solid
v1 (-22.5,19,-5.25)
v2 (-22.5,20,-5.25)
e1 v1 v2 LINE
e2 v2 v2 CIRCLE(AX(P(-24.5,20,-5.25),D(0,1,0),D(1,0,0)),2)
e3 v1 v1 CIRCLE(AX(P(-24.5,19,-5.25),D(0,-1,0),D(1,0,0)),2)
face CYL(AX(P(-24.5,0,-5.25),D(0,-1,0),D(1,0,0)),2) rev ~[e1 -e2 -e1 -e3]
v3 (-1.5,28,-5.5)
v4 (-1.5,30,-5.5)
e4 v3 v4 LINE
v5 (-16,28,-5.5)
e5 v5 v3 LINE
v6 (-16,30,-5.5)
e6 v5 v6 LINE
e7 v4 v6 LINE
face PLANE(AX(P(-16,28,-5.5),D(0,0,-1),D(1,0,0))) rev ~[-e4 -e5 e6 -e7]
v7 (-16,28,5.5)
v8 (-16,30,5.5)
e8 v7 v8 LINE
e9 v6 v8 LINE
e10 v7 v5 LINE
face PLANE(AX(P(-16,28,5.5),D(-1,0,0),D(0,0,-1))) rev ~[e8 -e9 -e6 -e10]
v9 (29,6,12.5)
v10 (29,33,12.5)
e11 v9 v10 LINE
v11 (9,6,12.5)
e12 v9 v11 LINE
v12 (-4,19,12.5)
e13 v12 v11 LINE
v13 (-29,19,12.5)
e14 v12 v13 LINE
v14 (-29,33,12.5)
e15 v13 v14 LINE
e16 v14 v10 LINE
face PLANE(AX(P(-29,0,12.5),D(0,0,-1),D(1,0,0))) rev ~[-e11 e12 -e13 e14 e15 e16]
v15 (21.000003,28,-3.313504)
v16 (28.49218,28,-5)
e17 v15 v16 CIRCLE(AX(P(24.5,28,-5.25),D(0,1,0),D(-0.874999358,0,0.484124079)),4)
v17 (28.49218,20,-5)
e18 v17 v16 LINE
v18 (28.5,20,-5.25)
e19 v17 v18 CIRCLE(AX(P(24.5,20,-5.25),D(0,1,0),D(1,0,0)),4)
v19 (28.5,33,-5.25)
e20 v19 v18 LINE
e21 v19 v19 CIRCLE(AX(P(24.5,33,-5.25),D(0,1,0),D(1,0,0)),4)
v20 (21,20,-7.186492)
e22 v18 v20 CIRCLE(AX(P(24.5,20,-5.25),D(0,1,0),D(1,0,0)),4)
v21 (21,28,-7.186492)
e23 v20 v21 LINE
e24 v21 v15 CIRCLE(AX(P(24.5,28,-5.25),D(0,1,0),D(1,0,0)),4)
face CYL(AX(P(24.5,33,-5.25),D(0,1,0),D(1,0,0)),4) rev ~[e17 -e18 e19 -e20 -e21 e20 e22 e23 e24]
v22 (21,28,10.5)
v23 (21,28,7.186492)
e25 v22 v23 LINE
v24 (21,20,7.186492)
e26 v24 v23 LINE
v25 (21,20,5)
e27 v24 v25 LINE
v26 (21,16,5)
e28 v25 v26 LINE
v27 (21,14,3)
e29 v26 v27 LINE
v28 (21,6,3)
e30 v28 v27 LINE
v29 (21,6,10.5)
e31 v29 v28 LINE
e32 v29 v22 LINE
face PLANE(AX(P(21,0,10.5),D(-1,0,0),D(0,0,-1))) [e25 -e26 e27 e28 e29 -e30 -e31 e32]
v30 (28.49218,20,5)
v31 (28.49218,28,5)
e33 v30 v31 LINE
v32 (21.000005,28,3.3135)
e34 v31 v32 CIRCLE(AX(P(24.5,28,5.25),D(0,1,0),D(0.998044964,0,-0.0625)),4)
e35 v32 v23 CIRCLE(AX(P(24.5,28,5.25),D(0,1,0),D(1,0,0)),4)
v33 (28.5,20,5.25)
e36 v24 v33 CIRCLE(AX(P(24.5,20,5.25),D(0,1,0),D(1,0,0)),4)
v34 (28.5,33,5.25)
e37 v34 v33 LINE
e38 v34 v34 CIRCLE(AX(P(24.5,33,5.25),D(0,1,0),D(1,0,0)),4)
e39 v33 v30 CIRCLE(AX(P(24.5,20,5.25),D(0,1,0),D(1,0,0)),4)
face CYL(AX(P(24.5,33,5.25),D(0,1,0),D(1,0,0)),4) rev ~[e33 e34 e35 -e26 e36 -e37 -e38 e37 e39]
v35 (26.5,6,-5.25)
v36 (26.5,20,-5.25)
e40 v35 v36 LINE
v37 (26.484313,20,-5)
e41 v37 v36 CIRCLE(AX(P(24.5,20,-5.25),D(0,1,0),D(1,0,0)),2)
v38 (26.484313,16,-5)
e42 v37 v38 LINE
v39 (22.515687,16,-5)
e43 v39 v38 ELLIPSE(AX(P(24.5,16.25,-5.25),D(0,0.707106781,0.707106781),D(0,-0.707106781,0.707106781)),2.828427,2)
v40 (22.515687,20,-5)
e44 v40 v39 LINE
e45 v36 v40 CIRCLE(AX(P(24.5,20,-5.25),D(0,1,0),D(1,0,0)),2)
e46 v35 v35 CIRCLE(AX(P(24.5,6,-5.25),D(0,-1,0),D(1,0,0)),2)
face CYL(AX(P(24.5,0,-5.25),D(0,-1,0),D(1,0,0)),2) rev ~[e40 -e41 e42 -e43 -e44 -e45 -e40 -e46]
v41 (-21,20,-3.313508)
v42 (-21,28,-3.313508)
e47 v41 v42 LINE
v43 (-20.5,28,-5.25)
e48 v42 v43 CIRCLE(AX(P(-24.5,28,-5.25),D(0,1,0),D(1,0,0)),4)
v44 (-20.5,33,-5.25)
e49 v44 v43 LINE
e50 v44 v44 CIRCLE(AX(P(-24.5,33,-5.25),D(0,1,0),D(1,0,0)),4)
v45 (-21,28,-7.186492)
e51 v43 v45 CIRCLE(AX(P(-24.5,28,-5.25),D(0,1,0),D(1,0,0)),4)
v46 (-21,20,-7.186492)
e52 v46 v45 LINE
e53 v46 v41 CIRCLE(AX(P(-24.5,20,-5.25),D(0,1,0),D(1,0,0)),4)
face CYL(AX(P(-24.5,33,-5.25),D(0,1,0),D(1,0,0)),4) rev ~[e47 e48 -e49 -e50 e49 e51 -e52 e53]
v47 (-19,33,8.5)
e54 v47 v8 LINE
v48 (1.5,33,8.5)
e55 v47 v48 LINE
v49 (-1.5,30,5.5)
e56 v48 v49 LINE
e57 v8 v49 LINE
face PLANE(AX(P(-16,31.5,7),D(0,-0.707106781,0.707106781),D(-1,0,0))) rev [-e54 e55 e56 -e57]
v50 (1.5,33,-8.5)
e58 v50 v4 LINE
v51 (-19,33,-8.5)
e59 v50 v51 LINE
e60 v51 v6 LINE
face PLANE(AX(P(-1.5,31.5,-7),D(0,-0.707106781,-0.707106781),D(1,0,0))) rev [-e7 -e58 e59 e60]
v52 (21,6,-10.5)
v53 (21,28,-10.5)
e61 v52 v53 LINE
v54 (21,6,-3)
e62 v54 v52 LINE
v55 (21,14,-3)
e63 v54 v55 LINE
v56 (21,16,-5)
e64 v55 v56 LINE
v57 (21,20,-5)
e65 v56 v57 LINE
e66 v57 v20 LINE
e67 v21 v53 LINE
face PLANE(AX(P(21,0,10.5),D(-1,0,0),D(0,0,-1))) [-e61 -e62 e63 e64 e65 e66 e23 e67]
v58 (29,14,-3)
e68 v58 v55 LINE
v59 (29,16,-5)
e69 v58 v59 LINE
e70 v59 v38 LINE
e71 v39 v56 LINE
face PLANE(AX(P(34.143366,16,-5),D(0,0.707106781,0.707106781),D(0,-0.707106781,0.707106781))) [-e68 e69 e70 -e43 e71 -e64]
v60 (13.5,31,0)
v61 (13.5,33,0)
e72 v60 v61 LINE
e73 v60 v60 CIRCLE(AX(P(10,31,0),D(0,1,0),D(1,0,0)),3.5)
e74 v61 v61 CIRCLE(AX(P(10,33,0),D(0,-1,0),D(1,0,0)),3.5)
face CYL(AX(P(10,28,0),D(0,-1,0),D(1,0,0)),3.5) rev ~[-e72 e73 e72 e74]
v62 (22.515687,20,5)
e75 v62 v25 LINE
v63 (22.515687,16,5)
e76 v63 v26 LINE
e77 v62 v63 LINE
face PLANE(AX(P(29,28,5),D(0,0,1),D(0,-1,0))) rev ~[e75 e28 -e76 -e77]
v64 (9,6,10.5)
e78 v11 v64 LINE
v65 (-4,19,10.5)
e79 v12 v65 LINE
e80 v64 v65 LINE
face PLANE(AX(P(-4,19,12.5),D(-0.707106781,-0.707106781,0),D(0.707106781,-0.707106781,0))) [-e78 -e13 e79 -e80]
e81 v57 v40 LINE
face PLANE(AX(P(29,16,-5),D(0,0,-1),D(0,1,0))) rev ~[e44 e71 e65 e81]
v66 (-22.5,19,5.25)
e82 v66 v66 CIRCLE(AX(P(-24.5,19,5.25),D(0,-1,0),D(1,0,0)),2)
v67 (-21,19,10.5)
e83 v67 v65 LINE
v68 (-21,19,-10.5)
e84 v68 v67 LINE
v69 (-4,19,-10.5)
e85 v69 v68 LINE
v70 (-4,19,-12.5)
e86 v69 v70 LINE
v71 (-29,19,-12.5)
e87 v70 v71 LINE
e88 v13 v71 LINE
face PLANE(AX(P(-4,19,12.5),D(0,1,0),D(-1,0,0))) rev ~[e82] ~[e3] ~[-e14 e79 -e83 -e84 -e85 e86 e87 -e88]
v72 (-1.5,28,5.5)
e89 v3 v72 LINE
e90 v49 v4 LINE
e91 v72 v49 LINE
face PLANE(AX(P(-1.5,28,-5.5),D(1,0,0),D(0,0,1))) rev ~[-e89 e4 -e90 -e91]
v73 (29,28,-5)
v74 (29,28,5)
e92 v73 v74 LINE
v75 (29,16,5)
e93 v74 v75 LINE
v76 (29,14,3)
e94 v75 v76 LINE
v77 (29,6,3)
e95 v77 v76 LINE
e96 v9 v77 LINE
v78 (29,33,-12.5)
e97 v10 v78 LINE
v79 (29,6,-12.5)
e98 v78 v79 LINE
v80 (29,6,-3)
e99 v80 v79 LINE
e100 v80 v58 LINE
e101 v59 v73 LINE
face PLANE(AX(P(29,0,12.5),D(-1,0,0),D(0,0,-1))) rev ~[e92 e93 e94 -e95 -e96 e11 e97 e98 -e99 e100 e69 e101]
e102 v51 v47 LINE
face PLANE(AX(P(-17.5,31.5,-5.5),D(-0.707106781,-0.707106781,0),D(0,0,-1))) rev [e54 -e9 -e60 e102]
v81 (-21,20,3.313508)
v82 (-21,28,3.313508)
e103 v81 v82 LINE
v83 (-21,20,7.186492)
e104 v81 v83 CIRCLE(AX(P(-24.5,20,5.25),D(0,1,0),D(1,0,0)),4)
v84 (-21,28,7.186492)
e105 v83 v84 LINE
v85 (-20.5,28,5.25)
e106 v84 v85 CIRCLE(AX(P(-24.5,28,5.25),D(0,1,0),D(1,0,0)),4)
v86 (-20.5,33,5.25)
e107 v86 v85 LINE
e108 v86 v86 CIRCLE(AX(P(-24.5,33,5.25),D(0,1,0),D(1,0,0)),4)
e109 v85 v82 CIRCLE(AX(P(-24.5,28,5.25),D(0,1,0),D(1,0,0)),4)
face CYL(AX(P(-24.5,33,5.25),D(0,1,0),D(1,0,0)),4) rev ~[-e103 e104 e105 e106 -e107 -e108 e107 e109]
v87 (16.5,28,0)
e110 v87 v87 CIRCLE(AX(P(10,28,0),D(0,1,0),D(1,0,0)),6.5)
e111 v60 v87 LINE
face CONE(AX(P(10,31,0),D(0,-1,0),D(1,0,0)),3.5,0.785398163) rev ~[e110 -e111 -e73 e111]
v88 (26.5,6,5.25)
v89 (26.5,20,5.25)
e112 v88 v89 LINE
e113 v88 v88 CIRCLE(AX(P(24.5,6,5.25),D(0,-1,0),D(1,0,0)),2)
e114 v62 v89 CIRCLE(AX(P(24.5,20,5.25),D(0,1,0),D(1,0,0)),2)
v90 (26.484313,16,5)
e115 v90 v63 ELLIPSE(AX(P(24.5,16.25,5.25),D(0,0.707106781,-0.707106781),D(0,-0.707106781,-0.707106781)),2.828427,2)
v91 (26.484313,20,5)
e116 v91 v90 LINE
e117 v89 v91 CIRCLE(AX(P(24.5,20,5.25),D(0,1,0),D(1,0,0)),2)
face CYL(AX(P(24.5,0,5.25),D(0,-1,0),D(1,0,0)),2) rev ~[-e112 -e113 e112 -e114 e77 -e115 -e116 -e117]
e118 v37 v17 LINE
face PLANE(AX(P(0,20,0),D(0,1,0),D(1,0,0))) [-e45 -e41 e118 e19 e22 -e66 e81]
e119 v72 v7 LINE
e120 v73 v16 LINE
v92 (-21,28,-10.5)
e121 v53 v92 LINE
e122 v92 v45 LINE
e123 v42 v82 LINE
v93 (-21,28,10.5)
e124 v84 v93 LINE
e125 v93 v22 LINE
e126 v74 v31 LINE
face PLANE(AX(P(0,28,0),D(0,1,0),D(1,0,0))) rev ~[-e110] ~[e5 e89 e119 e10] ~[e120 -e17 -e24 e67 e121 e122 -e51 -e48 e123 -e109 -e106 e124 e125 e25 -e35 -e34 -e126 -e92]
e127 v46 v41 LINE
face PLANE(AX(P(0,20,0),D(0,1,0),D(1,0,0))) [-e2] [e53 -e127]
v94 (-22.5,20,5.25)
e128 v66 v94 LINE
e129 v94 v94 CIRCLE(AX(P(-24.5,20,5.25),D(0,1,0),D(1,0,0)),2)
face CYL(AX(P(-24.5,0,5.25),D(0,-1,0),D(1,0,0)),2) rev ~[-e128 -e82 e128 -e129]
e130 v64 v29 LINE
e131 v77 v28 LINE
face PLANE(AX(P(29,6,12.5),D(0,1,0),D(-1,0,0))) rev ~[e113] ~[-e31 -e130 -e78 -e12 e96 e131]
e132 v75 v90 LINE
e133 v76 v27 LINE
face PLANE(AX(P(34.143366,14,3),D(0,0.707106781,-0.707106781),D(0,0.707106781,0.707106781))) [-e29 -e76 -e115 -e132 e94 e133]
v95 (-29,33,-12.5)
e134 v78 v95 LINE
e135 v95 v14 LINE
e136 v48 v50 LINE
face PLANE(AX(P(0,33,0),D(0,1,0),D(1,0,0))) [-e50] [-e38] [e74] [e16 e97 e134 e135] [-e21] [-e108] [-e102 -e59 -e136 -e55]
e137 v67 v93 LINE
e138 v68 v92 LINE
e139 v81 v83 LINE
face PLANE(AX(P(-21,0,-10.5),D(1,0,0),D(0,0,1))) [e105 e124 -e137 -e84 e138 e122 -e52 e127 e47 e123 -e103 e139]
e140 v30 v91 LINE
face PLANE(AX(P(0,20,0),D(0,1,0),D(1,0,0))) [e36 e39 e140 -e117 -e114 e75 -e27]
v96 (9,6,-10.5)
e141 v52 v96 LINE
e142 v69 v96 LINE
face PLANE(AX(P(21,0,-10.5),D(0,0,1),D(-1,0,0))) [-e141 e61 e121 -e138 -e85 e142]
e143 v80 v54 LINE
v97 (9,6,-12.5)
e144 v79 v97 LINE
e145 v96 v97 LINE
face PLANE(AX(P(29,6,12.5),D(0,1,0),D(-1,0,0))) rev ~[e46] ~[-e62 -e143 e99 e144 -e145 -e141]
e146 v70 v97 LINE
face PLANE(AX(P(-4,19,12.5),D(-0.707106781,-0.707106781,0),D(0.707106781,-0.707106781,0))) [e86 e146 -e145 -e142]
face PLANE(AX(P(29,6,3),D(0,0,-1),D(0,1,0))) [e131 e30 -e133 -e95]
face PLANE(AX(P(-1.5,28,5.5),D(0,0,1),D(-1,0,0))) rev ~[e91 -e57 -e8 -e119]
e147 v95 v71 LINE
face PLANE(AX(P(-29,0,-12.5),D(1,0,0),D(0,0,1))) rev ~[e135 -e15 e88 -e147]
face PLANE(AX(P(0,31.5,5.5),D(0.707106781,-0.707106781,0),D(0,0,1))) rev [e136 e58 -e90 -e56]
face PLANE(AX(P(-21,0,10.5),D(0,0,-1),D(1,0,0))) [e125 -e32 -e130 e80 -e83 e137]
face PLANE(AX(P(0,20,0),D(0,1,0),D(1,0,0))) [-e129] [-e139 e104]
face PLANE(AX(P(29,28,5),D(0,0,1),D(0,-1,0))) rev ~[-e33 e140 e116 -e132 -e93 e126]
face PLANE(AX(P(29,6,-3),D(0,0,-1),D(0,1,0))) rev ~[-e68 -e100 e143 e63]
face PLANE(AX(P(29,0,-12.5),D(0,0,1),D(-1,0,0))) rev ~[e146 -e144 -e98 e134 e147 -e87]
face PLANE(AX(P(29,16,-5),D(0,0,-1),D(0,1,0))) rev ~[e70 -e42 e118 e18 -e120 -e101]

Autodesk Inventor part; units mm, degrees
ref_plane "YZ Plane" through (0, 0, 0) normal (1, 0, 0) x (0, 1, 0)
ref_plane "XZ Plane" through (0, 0, 0) normal (0, 1, 0) x (-1, 0, 0)
ref_plane "XY Plane" through (0, 0, 0) normal (0, 0, 1) x (1, 0, 0)
sketch "Esquisse1" plane through (0, 0, 0) normal (0, 1, 0) x (-1, 0, 0)
  line L0 (21, 10.5) -> (-21, 10.5)
  line L1 (-21, 10.5) -> (-21, -10.5)
  line L2 (-21, -10.5) -> (21, -10.5)
  line L3 (21, -10.5) -> (21, 10.5)
  line L4 (29, 12.5) -> (-29, 12.5)
  line L5 (-29, 12.5) -> (-29, -12.5)
  line L6 (-29, -12.5) -> (29, -12.5)
  line L7 (29, -12.5) -> (29, 12.5)
  point P0 (0, 0)
  dimension "d0" = 21
  dimension "d1" = 10.5
  dimension "d2" = 42
  dimension "d3" = 21
  dimension "d4" = 2
  dimension "d5" = 2
  dimension "d6" = 8
  dimension "d7" = 8
extrude "Extrusion1" add sketch "Esquisse1" along normal blind 28
sketch "Esquisse2" plane through (0, 28, 0) normal (0, 1, 0) x (1, 0, 0)
  line L0 (-29, -12.5) -> (29, -12.5)
  line L1 (29, -12.5) -> (29, 12.5)
  line L2 (29, 12.5) -> (-29, 12.5)
  line L3 (-29, 12.5) -> (-29, -12.5)
  point P0 (0, 0)
extrude "Extrusion2" add sketch "Esquisse2" along normal blind 5
sketch "Esquisse3" plane through (0, 0, 0) normal (0, -1, 0) x (1, 0, 0)
  line L0 (-28, 10.5) -> (-21, 0) construction
  line L1 (-21, 0) -> (-28, -10.5) construction
  line L2 (-21, -10.5) -> (-28, 0) construction
  line L3 (-28, 0) -> (-21, 10.5) construction
  line L4 (21, 10.5) -> (28, 0) construction
  line L5 (21, -10.5) -> (28, 0) construction
  line L6 (28, -10.5) -> (21, 0) construction
  line L7 (21, 0) -> (28, 10.5) construction
  circle A0 centre (24.5, 5.25) radius 2
  circle A1 centre (24.5, -5.25) radius 2
  circle A2 centre (-24.5, 5.25) radius 2
  circle A3 centre (-24.5, -5.25) radius 2
  line L8 (-21, 10.5) -> (-28, 10.5)
  line L9 (-28, 10.5) -> (-28, -10.5)
  line L10 (-28, -10.5) -> (-21, -10.5)
  line L11 (-21, -10.5) -> (-21, 10.5)
  line L12 (28, 10.5) -> (21, 10.5)
  line L13 (21, 10.5) -> (21, -10.5)
  line L14 (21, -10.5) -> (28, -10.5)
  line L15 (28, -10.5) -> (28, 10.5)
  line L16 (21, 10.5) -> (21, -10.5) projected
  line L17 (21, -10.5) -> (-21, -10.5) projected
  line L18 (-21, 10.5) -> (21, 10.5) projected
  line L19 (-21, -10.5) -> (-21, 10.5) projected
  point P0 (0, 0)
  dimension "d12" = 4
  dimension "d13" = 4
  dimension "d14" = 4
  dimension "d15" = 4
  dimension "d25" = 7
  dimension "d26" = 7
extrude "Extrusion3" cut sketch "Esquisse3" against normal through all contours A0 | A1 | A2 | A3
sketch "Esquisse4" plane through (0, 28, 0) normal (0, -1, 0) x (1, 0, 0)
  line L0 (-21, 10.5) -> (10, 10.5)
  line L1 (10, 10.5) -> (10, -10.5)
  line L2 (10, -10.5) -> (-21, -10.5)
  line L3 (-21, -10.5) -> (-21, 10.5)
  line L4 (21, -10.5) -> (-21, -10.5) projected
  circle A0 centre (10, 0) radius 3.5
  line L5 (21, 10.5) -> (21, -10.5) projected
  point P0 (0, 0)
  dimension "d19" = 7
  dimension "d50" = 11
extrude "Extrusion4" cut sketch "Esquisse4" against normal through all contours A0 L1 | L1 A0
chamfer "Chanfrein1" distance 3 angle 45 1 edges at (6.5, 28, 0)
sketch "Esquisse5" plane through (-29, 0, 12.5) normal (0, 0, 1) x (1, 0, 0)
  line L0 (0, 0) -> (25, 0)
  line L1 (25, 0) -> (25, 19)
  line L2 (25, 19) -> (0, 19)
  line L3 (0, 19) -> (0, 0)
  line L4 (25, 0) -> (58, 0)
  line L5 (58, 0) -> (58, 6)
  line L6 (58, 6) -> (25, 6)
  line L7 (25, 6) -> (25, 0)
  line L8 (25, 19) -> (38, 6)
  point P0 (29, 0)
  dimension "d27" = 19
  dimension "d29" = 6
  dimension "d30" = 45
  dimension "d33" = 20
extrude "Extrusion5" cut sketch "Esquisse5" against normal through all
sketch "Esquisse6" plane through (0, 33, 0) normal (0, 1, 0) x (1, 0, 0)
  circle A0 centre (-24.5, -5.25) radius 4
  circle A1 centre (-24.5, 5.25) radius 4
  circle A2 centre (24.5, -5.25) radius 4
  circle A3 centre (24.5, 5.25) radius 4
  circle A4 centre (24.5, 5.25) radius 2 projected
  circle A5 centre (24.5, -5.25) radius 2 projected
  circle A6 centre (-24.5, -5.25) radius 2 projected
  circle A7 centre (-24.5, 5.25) radius 2 projected
  point P0 (0, 0)
  dimension "d34" = 8
  dimension "d35" = 8
  dimension "d36" = 8
  dimension "d37" = 8
extrude "Extrusion6" cut sketch "Esquisse6" against normal blind 13
sketch "Esquisse7" plane through (29, 33, 12.5) normal (1, 0, 0) x (0, 0, -1)
  line L0 (7.5, -27) -> (17.5, -27)
  line L1 (17.5, -27) -> (17.5, -5)
  line L2 (17.5, -5) -> (7.5, -5)
  line L3 (7.5, -5) -> (7.5, -27)
  line L4 (0, -27) -> (25, -27) projected
  line L5 (15.8135, -5) -> (9.1865, -5) projected
  line L6 (17.5, -27) -> (15.5, -27)
  line L7 (15.5, -27) -> (15.5, -17)
  line L8 (15.5, -17) -> (17.5, -17)
  line L9 (17.5, -17) -> (17.5, -27)
  line L10 (7.5, -27) -> (9.5, -27)
  line L11 (9.5, -27) -> (9.5, -17)
  line L12 (9.5, -17) -> (7.5, -17)
  line L13 (7.5, -17) -> (7.5, -27)
  point P0 (12.5, -33)
  dimension "d40" = 10
  dimension "d41" = 5
  dimension "d44" = 6
  dimension "d45" = 3
  dimension "d46" = 10
extrude "Extrusion7" cut sketch "Esquisse7" against normal up to next contours L11 L12 L3 L2 L1 L8 L7 L0
chamfer "Chanfrein2" distance 2 angle 45 2 edges at (25, 16, 3) (25, 16, -3)
sketch "Esquisse8" plane through (0, 28, 0) normal (0, -1, 0) x (1, 0, 0)
  line L0 (-16, -5.5) -> (-1.5, -5.5)
  line L1 (-1.5, -5.5) -> (-1.5, 5.5)
  line L2 (-1.5, 5.5) -> (-16, 5.5)
  line L3 (-16, 5.5) -> (-16, -5.5)
  line L4 (-21, 3.3135) -> (-21, -3.3135) projected
  line L5 (-4, 10.5) -> (-21, 10.5) projected
  line L6 (-21, -10.5) -> (-4, -10.5) projected
  circle A0 centre (10, 0) radius 6.5 projected
  point P0 (0, 0)
  dimension "d51" = 5
  dimension "d52" = 5
  dimension "d53" = 5
  dimension "d54" = 5
extrude "Extrusion8" cut sketch "Esquisse8" against normal through all contours L3 L2 L1 L0
chamfer "Chanfrein3" distance 3 angle 45 4 edges at (-8.75, 33, 5.5) (-1.5, 33, 0) (-8.75, 33, -5.5) (-16, 33, 0)
equation "\"d1\" = 0.5 * d0"
equation "\"d3\" = 0.5 * d2"
equation "\"d13\" = d12"
equation "\"d14\" = d12"
equation "\"d15\" = d12"
equation "\"d35\" = d34"
equation "\"d36\" = d34"
equation "\"d37\" = d34"
equation "\"d41\" = 0.5 * d40"
equation "\"d45\" = 0.5 * d44"
properties part number "forearm_anti_axe"
